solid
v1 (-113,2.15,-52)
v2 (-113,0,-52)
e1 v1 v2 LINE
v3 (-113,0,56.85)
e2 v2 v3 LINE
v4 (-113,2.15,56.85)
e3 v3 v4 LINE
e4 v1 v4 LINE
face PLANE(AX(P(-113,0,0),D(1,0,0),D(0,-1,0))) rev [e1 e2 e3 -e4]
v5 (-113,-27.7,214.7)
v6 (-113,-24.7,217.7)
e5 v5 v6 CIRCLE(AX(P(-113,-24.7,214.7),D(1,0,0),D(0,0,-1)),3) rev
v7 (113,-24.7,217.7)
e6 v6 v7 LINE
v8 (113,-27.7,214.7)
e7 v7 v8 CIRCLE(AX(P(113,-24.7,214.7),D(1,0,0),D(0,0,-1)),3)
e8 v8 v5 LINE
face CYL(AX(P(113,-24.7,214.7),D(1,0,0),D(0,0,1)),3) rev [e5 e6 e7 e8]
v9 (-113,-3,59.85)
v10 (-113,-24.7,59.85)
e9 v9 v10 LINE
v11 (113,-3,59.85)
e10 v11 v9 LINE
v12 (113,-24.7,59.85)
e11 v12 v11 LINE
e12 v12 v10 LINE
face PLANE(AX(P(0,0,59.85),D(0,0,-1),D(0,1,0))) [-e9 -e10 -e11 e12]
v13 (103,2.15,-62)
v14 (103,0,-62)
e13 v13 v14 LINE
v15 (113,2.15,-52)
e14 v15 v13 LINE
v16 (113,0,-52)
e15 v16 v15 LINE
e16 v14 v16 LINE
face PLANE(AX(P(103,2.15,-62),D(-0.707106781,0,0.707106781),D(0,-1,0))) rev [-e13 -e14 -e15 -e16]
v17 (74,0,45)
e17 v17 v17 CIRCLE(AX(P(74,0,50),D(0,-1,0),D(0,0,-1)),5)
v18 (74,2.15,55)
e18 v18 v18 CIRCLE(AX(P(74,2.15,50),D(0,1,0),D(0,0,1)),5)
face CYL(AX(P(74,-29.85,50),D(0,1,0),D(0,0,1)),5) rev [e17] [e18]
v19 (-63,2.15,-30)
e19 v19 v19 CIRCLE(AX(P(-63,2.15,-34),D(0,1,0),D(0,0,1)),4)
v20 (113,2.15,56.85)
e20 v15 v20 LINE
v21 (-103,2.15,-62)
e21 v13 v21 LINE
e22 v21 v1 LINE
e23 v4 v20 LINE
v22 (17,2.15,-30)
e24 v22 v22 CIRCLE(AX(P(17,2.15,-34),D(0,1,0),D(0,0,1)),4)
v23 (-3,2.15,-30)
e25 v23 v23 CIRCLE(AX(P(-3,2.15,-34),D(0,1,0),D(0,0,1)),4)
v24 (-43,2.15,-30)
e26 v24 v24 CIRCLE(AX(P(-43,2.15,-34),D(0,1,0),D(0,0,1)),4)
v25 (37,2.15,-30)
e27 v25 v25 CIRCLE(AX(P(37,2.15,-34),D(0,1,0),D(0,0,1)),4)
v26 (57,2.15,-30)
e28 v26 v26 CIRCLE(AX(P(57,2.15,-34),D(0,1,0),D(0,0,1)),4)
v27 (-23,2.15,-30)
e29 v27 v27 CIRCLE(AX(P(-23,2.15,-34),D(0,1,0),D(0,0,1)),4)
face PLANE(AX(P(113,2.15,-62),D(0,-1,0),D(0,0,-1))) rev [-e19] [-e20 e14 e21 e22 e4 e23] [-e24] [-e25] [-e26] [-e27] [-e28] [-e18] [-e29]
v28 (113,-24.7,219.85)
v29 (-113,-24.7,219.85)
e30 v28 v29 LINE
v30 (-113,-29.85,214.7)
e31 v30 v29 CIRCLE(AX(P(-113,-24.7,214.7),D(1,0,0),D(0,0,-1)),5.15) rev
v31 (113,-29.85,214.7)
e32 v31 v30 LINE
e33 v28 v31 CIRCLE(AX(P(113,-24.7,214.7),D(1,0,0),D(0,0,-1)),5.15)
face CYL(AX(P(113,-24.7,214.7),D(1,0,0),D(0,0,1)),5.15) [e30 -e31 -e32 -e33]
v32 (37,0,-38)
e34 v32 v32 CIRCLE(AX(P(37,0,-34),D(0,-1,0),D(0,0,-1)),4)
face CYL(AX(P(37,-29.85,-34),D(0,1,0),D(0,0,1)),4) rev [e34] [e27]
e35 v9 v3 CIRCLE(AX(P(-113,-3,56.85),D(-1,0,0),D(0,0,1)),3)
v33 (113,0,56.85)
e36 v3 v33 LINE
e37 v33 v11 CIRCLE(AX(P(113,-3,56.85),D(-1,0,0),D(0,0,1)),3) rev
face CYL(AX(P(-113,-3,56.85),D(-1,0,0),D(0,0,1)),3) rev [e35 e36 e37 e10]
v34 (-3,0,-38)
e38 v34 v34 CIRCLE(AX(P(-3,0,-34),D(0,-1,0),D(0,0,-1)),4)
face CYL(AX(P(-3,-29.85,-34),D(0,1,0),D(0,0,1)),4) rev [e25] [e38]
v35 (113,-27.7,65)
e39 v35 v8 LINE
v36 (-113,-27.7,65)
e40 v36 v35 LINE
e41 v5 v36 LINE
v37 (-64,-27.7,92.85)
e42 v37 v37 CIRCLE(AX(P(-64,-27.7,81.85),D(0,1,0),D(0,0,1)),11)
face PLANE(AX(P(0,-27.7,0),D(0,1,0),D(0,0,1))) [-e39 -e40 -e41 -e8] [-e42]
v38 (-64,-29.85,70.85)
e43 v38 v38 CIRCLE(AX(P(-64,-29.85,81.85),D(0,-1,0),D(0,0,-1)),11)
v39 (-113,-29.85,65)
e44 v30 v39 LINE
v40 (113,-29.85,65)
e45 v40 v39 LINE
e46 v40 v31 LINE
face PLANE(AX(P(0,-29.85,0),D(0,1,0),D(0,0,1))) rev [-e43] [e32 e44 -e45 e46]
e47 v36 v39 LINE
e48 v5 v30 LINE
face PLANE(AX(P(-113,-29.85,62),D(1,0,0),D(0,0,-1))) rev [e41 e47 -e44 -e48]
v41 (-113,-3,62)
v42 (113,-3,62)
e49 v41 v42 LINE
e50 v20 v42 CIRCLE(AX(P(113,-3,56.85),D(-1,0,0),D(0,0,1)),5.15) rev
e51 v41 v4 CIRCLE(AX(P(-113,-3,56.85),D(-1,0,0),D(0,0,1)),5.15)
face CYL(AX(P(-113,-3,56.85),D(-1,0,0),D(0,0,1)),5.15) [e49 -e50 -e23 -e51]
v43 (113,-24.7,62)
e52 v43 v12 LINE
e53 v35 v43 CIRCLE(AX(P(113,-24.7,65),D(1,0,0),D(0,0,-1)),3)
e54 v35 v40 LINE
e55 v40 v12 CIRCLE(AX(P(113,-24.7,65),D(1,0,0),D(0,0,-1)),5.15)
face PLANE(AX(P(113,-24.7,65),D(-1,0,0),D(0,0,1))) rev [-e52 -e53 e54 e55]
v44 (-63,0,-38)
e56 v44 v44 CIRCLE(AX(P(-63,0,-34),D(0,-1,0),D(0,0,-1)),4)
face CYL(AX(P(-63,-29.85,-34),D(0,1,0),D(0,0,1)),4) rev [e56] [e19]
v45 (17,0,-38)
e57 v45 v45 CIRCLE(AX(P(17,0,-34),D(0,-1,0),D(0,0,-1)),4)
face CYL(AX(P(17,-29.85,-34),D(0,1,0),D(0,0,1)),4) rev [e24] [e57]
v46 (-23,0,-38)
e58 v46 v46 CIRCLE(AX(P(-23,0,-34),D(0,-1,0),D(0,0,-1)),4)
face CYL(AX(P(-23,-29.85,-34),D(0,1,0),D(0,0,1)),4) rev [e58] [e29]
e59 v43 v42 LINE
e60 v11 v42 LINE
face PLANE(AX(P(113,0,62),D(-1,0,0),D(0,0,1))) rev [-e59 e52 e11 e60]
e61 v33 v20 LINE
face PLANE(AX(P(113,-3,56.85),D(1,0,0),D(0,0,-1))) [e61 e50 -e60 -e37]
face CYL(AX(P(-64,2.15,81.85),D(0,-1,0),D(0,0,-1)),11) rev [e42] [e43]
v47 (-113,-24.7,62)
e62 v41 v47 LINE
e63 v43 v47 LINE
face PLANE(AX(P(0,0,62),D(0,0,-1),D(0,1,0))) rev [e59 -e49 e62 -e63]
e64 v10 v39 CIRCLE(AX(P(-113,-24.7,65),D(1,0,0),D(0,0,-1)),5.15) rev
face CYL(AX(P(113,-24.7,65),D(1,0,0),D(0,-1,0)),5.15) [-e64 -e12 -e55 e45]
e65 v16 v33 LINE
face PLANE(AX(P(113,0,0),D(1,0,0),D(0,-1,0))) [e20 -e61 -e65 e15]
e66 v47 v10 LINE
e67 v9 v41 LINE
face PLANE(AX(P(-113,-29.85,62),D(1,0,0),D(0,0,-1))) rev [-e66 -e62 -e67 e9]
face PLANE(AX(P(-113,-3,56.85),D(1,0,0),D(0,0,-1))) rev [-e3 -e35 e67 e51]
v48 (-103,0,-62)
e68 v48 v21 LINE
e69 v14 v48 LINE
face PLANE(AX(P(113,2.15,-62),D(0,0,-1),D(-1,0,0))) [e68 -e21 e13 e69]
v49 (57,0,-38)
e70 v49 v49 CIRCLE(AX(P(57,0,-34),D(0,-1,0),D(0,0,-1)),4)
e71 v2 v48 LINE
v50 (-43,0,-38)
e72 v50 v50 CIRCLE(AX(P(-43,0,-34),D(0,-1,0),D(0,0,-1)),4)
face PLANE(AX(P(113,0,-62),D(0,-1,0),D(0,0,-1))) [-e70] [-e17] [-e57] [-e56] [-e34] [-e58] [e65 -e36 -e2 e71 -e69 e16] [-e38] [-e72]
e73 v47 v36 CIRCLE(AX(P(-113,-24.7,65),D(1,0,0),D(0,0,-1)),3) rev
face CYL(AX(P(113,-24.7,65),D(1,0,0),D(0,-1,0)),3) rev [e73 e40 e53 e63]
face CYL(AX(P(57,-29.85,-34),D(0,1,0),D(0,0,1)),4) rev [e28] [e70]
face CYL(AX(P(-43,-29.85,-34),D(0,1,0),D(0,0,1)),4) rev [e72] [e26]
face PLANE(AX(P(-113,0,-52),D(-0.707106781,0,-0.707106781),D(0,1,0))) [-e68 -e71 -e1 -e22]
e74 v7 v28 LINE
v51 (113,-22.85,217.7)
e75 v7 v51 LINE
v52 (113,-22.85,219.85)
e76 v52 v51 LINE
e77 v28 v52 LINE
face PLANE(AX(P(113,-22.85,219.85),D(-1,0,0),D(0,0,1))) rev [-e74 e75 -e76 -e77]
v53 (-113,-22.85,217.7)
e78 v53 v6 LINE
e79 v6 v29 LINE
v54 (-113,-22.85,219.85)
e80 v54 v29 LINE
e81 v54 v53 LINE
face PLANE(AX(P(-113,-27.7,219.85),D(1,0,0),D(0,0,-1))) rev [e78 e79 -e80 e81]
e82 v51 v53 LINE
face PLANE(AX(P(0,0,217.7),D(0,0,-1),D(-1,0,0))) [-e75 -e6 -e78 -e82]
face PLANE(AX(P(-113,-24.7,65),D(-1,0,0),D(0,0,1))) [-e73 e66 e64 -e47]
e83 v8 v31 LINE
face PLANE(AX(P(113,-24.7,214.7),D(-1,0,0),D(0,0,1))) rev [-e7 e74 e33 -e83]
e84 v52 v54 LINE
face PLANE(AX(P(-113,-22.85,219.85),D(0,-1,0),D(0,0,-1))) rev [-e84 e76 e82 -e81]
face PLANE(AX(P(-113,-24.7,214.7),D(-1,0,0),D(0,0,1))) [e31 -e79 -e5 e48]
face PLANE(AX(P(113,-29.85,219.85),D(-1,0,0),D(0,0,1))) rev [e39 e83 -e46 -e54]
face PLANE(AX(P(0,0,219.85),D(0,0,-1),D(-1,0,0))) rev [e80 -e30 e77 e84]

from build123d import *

# Parameters (mm, degrees)
SKETCH1_W                    = 2.15
SKETCH1_H                    = 124
BASE_FLANGE1_DEPTH           = 113
CHAMFER1_SIZE                = 10
EDGE_FLANGE1_STRIP_W         = 14.6
EDGE_FLANGE1_STRIP_H         = 2.15
EDGE_FLANGE1_STRIP_CUT_DEPTH = 226
EDGE_FLANGE1_DEPTH           = 226
EDGE_FLANGE2_STRIP_W         = 14.6
EDGE_FLANGE2_STRIP_H         = 2.15
EDGE_FLANGE2_STRIP_CUT_DEPTH = 226
EDGE_FLANGE2_DEPTH           = 226
EDGE_FLANGE3_STRIP_W         = 14.6
EDGE_FLANGE3_STRIP_H         = 2.15
EDGE_FLANGE3_STRIP_CUT_DEPTH = 226
EDGE_FLANGE3_DEPTH           = 226
SKETCH15_R                   = 11
CUT_EXTRUDE1_DEPTH           = 250.252928769
SKETCH16_R                   = 4
CUT_EXTRUDE2_DEPTH           = 250.252928769
LPATTERN1_COUNT              = 7
LPATTERN1_PITCH              = 20
SKETCH17_R                   = 5
CUT_EXTRUDE3_DEPTH           = 250.252928769


# Sheet-metal steps are written as plain solids
with BuildPart() as part:
    # Sketch1 → Base-Flange1 (new, symmetric)
    with BuildSketch(Plane(origin=(0, 0, 0), x_dir=(0, -1, 0), z_dir=(1, 0, 0))):
        with Locations((-1.075, 0)):
            Rectangle(SKETCH1_W, SKETCH1_H)
    extrude(amount=BASE_FLANGE1_DEPTH, both=True)

    # Chamfer1
    chamfer1_edges = [part.edges().sort_by_distance(p)[0] for p in [
        (113, 1.075, -62),
        (-113, 1.075, -62),
    ]]
    chamfer(chamfer1_edges, length=CHAMFER1_SIZE)

    # Edge-Flange1 strip (across the edge) → Edge-Flange1 strip cut (cut)
    with BuildSketch(Plane(origin=(113, 0, 62), x_dir=(0, 0, -1), z_dir=(-1, 0, 0))):
        with Locations((-2.15, -1.075)):
            Rectangle(EDGE_FLANGE1_STRIP_W, EDGE_FLANGE1_STRIP_H)
    extrude(amount=EDGE_FLANGE1_STRIP_CUT_DEPTH, mode=Mode.SUBTRACT)

    # Edge-Flange1 section (across the edge) → Edge-Flange1 (add)
    with BuildSketch(Plane(origin=(113, 0, 62), x_dir=(0, 0, -1), z_dir=(-1, 0, 0))):
        with BuildLine():
            Line((0, 3), (0, 29.85))
            Line((0, 29.85), (2.15, 29.85))
            Line((2.15, 29.85), (2.15, 3))
            ThreePointArc((2.15, 3), (3.028679656, 0.878679656), (5.15, 0))
            Line((5.15, 0), (5.15, -2.15))
            ThreePointArc((5.15, -2.15), (1.508400077, -0.641599923), (0, 3))
        make_face()
    extrude(amount=EDGE_FLANGE1_DEPTH)

    # Edge-Flange2 strip (across the edge) → Edge-Flange2 strip cut (cut)
    with BuildSketch(Plane(origin=(-113, -29.85, 62), x_dir=(0, 1, 0), z_dir=(1, 0, 0))):
        with Locations((-2.15, -1.075)):
            Rectangle(EDGE_FLANGE2_STRIP_W, EDGE_FLANGE2_STRIP_H)
    extrude(amount=EDGE_FLANGE2_STRIP_CUT_DEPTH, mode=Mode.SUBTRACT)

    # Edge-Flange2 section (across the edge) → Edge-Flange2 (add)
    with BuildSketch(Plane(origin=(-113, -29.85, 62), x_dir=(0, 1, 0), z_dir=(1, 0, 0))):
        with BuildLine():
            Line((0, 3), (0, 157.85))
            Line((0, 157.85), (2.15, 157.85))
            Line((2.15, 157.85), (2.15, 3))
            ThreePointArc((2.15, 3), (3.028679656, 0.878679656), (5.15, 0))
            Line((5.15, 0), (5.15, -2.15))
            ThreePointArc((5.15, -2.15), (1.508400077, -0.641599923), (0, 3))
        make_face()
    extrude(amount=EDGE_FLANGE2_DEPTH)

    # Edge-Flange3 strip (across the edge) → Edge-Flange3 strip cut (cut)
    with BuildSketch(Plane(origin=(-113, -27.7, 219.85), x_dir=(0, 0, -1), z_dir=(1, 0, 0))):
        with Locations((-2.15, -1.075)):
            Rectangle(EDGE_FLANGE3_STRIP_W, EDGE_FLANGE3_STRIP_H)
    extrude(amount=EDGE_FLANGE3_STRIP_CUT_DEPTH, mode=Mode.SUBTRACT)

    # Edge-Flange3 section (across the edge) → Edge-Flange3 (add)
    with BuildSketch(Plane(origin=(-113, -27.7, 219.85), x_dir=(0, 0, -1), z_dir=(1, 0, 0))):
        with BuildLine():
            Line((0, 3), (0, 4.85))
            Line((0, 4.85), (2.15, 4.85))
            Line((2.15, 4.85), (2.15, 3))
            ThreePointArc((2.15, 3), (3.028679656, 0.878679656), (5.15, 0))
            Line((5.15, 0), (5.15, -2.15))
            ThreePointArc((5.15, -2.15), (1.508400077, -0.641599923), (0, 3))
        make_face()
    extrude(amount=EDGE_FLANGE3_DEPTH)

    # Sketch15 → Cut-Extrude1 (cut, through all)
    with BuildSketch(Plane.XZ.offset(29.85)):
        with Locations(Location((-64, 81.85, 0), (0, 0, 270))):
            Circle(SKETCH15_R)
    extrude(amount=-CUT_EXTRUDE1_DEPTH, mode=Mode.SUBTRACT)

    # Sketch16 → Cut-Extrude2 (cut, through all)
    with BuildSketch(Plane(origin=(0, 2.15, 0), x_dir=(1, 0, 0), z_dir=(0, 1, 0))):
        with Locations(Location((-63, 34, 0), (0, 0, 270))):
            Circle(SKETCH16_R)
    cut_extrude2 = extrude(amount=-CUT_EXTRUDE2_DEPTH, mode=Mode.SUBTRACT)

    # LPattern1: Cut-Extrude2 ×7
    with Locations(*[(i * LPATTERN1_PITCH, 0, 0) for i in range(1, LPATTERN1_COUNT)]):
        add(cut_extrude2, mode=Mode.SUBTRACT)

    # Sketch17 → Cut-Extrude3 (cut, through all)
    with BuildSketch(Plane(origin=(0, 2.15, 0), x_dir=(1, 0, 0), z_dir=(0, 1, 0))):
        with Locations(Location((74, -50, 0), (0, 0, 270))):
            Circle(SKETCH17_R)
    extrude(amount=-CUT_EXTRUDE3_DEPTH, mode=Mode.SUBTRACT)


solid = part.part
